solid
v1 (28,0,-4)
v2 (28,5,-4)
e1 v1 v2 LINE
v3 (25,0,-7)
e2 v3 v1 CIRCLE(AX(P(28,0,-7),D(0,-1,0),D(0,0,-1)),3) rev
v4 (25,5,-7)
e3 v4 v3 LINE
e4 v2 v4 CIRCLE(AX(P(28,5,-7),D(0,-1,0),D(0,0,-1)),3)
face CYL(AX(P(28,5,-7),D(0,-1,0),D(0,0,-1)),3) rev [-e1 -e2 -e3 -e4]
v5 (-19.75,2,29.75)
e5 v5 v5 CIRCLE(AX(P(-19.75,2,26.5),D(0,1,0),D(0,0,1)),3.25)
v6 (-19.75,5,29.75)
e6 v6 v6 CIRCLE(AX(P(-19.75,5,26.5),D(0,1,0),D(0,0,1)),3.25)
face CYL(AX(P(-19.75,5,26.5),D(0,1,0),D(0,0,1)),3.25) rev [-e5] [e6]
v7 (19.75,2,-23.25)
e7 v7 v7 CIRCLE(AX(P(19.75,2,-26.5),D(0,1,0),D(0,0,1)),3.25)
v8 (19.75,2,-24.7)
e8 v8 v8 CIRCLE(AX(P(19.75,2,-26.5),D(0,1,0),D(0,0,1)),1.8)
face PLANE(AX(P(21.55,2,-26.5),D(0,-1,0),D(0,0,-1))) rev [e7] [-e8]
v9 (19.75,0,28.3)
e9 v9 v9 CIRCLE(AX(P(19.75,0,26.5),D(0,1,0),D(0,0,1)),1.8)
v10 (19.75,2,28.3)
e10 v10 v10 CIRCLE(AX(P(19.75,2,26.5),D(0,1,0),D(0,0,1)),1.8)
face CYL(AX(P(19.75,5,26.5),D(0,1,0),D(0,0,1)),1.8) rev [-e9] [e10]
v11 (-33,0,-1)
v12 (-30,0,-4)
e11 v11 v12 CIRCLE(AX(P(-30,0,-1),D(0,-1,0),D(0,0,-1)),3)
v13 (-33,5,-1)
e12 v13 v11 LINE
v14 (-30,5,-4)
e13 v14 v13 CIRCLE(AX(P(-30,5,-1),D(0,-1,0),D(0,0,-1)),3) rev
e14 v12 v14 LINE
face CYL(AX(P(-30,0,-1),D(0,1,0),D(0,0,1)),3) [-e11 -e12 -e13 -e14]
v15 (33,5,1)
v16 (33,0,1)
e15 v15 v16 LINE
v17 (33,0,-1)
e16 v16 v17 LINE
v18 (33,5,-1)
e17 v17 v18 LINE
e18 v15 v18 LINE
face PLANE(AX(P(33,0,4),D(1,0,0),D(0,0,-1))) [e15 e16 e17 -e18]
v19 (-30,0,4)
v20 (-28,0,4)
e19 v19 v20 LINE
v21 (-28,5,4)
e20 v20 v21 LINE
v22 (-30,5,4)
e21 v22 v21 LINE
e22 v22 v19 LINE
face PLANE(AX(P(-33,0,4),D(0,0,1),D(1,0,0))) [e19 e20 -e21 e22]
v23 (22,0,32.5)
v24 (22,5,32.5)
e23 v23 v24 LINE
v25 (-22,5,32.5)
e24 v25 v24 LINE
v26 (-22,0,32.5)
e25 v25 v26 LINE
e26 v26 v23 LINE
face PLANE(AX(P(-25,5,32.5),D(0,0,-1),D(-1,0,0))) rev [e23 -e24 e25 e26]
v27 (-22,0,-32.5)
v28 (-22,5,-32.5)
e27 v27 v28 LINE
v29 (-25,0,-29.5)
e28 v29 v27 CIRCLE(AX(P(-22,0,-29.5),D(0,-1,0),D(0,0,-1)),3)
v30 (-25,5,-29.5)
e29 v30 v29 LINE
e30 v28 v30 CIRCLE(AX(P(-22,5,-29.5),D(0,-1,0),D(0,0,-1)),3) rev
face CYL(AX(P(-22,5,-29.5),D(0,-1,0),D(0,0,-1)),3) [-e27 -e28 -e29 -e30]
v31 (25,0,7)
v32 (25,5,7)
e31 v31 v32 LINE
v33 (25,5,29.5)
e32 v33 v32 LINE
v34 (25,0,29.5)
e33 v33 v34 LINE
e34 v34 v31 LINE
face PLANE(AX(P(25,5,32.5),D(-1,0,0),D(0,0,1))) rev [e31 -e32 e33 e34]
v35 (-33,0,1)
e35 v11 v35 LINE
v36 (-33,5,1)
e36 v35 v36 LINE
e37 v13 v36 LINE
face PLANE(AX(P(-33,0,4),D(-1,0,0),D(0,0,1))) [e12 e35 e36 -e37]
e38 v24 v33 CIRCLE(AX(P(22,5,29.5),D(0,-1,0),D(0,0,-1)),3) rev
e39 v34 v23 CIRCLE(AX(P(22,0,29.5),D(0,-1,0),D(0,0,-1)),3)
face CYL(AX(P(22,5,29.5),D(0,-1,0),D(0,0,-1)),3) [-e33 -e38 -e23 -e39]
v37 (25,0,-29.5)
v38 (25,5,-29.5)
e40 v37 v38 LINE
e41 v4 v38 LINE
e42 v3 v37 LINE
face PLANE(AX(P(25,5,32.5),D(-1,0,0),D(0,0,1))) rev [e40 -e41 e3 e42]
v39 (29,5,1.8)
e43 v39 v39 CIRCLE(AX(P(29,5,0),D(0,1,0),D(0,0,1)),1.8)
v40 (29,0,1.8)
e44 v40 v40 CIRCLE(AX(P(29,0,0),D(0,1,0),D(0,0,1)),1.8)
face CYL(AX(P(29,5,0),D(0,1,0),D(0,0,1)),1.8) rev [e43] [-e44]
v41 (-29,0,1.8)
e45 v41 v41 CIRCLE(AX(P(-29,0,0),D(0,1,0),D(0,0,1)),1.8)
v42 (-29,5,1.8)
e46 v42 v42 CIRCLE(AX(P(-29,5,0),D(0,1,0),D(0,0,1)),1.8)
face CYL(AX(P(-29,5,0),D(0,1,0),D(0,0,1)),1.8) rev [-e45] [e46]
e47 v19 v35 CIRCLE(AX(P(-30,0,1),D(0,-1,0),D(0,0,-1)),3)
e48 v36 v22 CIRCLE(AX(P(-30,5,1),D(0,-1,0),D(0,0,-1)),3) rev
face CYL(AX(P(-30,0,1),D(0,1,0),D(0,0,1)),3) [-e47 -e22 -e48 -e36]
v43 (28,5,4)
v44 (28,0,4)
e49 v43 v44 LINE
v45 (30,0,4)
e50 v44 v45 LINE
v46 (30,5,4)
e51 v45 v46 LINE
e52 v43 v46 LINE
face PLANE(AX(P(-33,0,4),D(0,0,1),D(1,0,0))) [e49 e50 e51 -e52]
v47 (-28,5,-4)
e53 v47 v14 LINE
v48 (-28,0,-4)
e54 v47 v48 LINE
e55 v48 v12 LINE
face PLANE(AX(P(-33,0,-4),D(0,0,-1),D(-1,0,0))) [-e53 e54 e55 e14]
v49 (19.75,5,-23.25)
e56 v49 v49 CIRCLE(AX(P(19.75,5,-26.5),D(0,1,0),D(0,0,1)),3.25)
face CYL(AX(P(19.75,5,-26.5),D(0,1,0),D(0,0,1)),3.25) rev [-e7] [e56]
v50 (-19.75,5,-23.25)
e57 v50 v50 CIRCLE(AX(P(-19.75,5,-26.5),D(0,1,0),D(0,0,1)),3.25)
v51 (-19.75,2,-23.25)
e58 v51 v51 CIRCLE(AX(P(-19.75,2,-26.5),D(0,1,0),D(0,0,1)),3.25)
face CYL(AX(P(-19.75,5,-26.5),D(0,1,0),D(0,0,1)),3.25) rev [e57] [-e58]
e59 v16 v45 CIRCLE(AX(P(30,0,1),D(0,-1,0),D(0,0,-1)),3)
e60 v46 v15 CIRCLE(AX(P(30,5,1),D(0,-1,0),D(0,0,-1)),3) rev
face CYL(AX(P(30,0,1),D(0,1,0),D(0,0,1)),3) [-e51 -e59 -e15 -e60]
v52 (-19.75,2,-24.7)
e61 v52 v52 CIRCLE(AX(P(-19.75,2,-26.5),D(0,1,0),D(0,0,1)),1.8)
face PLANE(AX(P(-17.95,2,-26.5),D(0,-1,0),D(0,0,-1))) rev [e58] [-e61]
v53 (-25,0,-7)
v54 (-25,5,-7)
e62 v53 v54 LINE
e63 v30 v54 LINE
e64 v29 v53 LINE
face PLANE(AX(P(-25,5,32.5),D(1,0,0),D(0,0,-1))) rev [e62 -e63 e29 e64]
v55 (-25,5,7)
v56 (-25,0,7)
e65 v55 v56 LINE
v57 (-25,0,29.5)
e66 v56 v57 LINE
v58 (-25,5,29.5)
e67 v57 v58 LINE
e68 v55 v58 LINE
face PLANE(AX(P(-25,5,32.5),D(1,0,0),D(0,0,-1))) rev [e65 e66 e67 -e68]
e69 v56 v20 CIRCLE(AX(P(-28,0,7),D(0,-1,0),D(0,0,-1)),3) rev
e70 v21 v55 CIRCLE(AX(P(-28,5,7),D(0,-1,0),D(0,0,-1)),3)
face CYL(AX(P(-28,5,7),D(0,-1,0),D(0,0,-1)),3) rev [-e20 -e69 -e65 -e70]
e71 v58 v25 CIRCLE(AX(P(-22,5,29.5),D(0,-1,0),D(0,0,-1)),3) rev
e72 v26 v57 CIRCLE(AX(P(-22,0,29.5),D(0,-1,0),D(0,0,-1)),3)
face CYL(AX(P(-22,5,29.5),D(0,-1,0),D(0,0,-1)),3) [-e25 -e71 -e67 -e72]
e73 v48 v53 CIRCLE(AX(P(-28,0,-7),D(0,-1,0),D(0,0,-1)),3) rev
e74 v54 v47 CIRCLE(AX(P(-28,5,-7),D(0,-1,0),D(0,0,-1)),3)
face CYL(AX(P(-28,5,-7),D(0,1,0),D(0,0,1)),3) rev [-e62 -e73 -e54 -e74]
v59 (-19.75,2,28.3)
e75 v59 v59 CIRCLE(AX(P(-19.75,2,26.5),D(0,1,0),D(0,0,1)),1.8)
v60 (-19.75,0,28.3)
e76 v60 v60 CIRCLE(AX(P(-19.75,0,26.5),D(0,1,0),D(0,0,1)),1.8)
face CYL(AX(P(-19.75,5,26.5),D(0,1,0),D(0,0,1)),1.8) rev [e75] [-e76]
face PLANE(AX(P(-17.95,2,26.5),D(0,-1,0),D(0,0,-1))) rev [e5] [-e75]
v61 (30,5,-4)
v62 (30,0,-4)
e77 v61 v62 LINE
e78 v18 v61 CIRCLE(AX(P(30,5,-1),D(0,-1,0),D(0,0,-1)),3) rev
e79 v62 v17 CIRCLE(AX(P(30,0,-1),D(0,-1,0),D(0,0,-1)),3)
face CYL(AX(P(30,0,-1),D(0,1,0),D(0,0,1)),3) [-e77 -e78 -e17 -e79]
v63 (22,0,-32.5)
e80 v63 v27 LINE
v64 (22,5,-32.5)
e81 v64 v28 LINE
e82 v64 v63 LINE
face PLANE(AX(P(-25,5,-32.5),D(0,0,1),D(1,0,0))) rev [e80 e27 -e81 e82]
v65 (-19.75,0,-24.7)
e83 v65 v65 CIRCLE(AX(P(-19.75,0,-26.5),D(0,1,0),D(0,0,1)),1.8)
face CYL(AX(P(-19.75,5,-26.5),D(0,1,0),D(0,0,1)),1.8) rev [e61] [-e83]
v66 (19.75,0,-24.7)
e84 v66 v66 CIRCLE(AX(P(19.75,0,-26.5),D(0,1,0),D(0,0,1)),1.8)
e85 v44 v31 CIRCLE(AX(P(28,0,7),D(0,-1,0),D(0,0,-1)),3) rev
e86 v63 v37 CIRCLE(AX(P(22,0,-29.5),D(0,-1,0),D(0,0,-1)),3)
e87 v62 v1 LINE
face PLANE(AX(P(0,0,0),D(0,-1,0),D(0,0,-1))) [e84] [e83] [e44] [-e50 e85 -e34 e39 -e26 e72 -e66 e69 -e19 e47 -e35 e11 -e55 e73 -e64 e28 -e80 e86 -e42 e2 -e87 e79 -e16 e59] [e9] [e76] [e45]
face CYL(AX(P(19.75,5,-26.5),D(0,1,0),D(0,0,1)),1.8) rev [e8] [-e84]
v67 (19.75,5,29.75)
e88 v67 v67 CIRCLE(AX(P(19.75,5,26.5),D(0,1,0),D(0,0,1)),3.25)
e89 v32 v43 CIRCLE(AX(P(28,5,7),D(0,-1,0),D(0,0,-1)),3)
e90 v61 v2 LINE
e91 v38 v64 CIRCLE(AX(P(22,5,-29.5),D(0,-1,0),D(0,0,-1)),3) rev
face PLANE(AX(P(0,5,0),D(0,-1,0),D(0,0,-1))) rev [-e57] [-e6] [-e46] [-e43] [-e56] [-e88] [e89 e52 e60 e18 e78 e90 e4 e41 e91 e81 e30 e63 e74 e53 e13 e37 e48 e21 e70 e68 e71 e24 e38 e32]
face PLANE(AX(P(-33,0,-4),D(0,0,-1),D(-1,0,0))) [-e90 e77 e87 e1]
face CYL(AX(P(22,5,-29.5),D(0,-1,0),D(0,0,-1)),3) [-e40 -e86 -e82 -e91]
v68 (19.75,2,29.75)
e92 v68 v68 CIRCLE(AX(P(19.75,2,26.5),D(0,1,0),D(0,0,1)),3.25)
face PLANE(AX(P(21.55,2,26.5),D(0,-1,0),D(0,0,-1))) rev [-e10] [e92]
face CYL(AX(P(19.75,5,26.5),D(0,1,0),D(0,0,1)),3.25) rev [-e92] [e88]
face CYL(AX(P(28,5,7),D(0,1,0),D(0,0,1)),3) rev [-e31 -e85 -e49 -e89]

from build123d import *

# Parameters (mm, degrees)
SKETCH1_W                      = 50
SKETCH1_H                      = 65
BOSS_EXTRUDE1_DEPTH            = 5
CBORE_START                    = 2
CBORE_FOR_M3_SHCS1_OUTLINE_R   = 3.25
CBORE_FOR_M3_SHCS1_DEPTH       = 3
CBORE_FOR_M3_SHCS1_2_OUTLINE_R = 1.8
CBORE_FOR_M3_SHCS1_2_DEPTH     = 2
SKETCH5_W                      = 66
SKETCH5_H                      = 8
BOSS_EXTRUDE2_DEPTH            = 5
FILLET1_R                      = 3
M3_CLEARANCE_HOLE1_D           = 3.6


# Read off the part's stored shape, not the designer's step: CBORE for M3 SHCS1
with BuildPart() as part:
    # Sketch1 → Boss-Extrude1 (new body)
    with BuildSketch(Plane(origin=(0, 0, 0), x_dir=(1, 0, 0), z_dir=(0, 1, 0))):
        Rectangle(SKETCH1_W, SKETCH1_H)
    extrude(amount=BOSS_EXTRUDE1_DEPTH)

    # CBORE for M3 SHCS1 outline → CBORE for M3 SHCS1 (cut)
    with BuildSketch(Plane(origin=(0, 0, 0), x_dir=(1, 0, 0), z_dir=(0, 1, 0)).offset(CBORE_START)):
        with Locations((19.75, -26.5)):
            Circle(CBORE_FOR_M3_SHCS1_OUTLINE_R)
        with Locations((-19.75, 26.5)):
            Circle(CBORE_FOR_M3_SHCS1_OUTLINE_R)
        with Locations((-19.75, -26.5)):
            Circle(CBORE_FOR_M3_SHCS1_OUTLINE_R)
        with Locations((19.75, 26.5)):
            Circle(CBORE_FOR_M3_SHCS1_OUTLINE_R)
    extrude(amount=CBORE_FOR_M3_SHCS1_DEPTH, mode=Mode.SUBTRACT)

    # CBORE for M3 SHCS1 2 outline → CBORE for M3 SHCS1 2 (cut)
    with BuildSketch(Plane(origin=(0, 0, 0), x_dir=(1, 0, 0), z_dir=(0, 1, 0))):
        with Locations((19.75, -26.5)):
            Circle(CBORE_FOR_M3_SHCS1_2_OUTLINE_R)
        with Locations((-19.75, 26.5)):
            Circle(CBORE_FOR_M3_SHCS1_2_OUTLINE_R)
        with Locations((-19.75, -26.5)):
            Circle(CBORE_FOR_M3_SHCS1_2_OUTLINE_R)
        with Locations((19.75, 26.5)):
            Circle(CBORE_FOR_M3_SHCS1_2_OUTLINE_R)
    extrude(amount=CBORE_FOR_M3_SHCS1_2_DEPTH, mode=Mode.SUBTRACT)

    # Sketch5 → Boss-Extrude2 (add)
    with BuildSketch(Plane(origin=(0, 5, 0), x_dir=(1, 0, 0), z_dir=(0, 1, 0))):
        Rectangle(SKETCH5_W, SKETCH5_H)
    extrude(amount=-BOSS_EXTRUDE2_DEPTH)

    # Fillet1
    fillet1_edges = [part.edges().sort_by_distance(p)[0] for p in [
        (33, 2.5, 4),
        (-33, 2.5, -4),
        (33, 2.5, -4),
        (25, 2.5, 4),
        (-25, 2.5, 4),
        (-33, 2.5, 4),
        (25, 2.5, -4),
        (-25, 2.5, -4),
        (25, 2.5, 32.5),
        (-25, 2.5, 32.5),
        (-25, 2.5, -32.5),
        (25, 2.5, -32.5),
    ]]
    fillet(fillet1_edges, radius=FILLET1_R)

    # M3 Clearance Hole1 (through all)
    with Locations(Plane(origin=(0, 5, 0), x_dir=(1, 0, 0), z_dir=(0, 1, 0))):
        with Locations((-29, 0), (29, 0)):
            Hole(M3_CLEARANCE_HOLE1_D / 2)


solid = part.part
